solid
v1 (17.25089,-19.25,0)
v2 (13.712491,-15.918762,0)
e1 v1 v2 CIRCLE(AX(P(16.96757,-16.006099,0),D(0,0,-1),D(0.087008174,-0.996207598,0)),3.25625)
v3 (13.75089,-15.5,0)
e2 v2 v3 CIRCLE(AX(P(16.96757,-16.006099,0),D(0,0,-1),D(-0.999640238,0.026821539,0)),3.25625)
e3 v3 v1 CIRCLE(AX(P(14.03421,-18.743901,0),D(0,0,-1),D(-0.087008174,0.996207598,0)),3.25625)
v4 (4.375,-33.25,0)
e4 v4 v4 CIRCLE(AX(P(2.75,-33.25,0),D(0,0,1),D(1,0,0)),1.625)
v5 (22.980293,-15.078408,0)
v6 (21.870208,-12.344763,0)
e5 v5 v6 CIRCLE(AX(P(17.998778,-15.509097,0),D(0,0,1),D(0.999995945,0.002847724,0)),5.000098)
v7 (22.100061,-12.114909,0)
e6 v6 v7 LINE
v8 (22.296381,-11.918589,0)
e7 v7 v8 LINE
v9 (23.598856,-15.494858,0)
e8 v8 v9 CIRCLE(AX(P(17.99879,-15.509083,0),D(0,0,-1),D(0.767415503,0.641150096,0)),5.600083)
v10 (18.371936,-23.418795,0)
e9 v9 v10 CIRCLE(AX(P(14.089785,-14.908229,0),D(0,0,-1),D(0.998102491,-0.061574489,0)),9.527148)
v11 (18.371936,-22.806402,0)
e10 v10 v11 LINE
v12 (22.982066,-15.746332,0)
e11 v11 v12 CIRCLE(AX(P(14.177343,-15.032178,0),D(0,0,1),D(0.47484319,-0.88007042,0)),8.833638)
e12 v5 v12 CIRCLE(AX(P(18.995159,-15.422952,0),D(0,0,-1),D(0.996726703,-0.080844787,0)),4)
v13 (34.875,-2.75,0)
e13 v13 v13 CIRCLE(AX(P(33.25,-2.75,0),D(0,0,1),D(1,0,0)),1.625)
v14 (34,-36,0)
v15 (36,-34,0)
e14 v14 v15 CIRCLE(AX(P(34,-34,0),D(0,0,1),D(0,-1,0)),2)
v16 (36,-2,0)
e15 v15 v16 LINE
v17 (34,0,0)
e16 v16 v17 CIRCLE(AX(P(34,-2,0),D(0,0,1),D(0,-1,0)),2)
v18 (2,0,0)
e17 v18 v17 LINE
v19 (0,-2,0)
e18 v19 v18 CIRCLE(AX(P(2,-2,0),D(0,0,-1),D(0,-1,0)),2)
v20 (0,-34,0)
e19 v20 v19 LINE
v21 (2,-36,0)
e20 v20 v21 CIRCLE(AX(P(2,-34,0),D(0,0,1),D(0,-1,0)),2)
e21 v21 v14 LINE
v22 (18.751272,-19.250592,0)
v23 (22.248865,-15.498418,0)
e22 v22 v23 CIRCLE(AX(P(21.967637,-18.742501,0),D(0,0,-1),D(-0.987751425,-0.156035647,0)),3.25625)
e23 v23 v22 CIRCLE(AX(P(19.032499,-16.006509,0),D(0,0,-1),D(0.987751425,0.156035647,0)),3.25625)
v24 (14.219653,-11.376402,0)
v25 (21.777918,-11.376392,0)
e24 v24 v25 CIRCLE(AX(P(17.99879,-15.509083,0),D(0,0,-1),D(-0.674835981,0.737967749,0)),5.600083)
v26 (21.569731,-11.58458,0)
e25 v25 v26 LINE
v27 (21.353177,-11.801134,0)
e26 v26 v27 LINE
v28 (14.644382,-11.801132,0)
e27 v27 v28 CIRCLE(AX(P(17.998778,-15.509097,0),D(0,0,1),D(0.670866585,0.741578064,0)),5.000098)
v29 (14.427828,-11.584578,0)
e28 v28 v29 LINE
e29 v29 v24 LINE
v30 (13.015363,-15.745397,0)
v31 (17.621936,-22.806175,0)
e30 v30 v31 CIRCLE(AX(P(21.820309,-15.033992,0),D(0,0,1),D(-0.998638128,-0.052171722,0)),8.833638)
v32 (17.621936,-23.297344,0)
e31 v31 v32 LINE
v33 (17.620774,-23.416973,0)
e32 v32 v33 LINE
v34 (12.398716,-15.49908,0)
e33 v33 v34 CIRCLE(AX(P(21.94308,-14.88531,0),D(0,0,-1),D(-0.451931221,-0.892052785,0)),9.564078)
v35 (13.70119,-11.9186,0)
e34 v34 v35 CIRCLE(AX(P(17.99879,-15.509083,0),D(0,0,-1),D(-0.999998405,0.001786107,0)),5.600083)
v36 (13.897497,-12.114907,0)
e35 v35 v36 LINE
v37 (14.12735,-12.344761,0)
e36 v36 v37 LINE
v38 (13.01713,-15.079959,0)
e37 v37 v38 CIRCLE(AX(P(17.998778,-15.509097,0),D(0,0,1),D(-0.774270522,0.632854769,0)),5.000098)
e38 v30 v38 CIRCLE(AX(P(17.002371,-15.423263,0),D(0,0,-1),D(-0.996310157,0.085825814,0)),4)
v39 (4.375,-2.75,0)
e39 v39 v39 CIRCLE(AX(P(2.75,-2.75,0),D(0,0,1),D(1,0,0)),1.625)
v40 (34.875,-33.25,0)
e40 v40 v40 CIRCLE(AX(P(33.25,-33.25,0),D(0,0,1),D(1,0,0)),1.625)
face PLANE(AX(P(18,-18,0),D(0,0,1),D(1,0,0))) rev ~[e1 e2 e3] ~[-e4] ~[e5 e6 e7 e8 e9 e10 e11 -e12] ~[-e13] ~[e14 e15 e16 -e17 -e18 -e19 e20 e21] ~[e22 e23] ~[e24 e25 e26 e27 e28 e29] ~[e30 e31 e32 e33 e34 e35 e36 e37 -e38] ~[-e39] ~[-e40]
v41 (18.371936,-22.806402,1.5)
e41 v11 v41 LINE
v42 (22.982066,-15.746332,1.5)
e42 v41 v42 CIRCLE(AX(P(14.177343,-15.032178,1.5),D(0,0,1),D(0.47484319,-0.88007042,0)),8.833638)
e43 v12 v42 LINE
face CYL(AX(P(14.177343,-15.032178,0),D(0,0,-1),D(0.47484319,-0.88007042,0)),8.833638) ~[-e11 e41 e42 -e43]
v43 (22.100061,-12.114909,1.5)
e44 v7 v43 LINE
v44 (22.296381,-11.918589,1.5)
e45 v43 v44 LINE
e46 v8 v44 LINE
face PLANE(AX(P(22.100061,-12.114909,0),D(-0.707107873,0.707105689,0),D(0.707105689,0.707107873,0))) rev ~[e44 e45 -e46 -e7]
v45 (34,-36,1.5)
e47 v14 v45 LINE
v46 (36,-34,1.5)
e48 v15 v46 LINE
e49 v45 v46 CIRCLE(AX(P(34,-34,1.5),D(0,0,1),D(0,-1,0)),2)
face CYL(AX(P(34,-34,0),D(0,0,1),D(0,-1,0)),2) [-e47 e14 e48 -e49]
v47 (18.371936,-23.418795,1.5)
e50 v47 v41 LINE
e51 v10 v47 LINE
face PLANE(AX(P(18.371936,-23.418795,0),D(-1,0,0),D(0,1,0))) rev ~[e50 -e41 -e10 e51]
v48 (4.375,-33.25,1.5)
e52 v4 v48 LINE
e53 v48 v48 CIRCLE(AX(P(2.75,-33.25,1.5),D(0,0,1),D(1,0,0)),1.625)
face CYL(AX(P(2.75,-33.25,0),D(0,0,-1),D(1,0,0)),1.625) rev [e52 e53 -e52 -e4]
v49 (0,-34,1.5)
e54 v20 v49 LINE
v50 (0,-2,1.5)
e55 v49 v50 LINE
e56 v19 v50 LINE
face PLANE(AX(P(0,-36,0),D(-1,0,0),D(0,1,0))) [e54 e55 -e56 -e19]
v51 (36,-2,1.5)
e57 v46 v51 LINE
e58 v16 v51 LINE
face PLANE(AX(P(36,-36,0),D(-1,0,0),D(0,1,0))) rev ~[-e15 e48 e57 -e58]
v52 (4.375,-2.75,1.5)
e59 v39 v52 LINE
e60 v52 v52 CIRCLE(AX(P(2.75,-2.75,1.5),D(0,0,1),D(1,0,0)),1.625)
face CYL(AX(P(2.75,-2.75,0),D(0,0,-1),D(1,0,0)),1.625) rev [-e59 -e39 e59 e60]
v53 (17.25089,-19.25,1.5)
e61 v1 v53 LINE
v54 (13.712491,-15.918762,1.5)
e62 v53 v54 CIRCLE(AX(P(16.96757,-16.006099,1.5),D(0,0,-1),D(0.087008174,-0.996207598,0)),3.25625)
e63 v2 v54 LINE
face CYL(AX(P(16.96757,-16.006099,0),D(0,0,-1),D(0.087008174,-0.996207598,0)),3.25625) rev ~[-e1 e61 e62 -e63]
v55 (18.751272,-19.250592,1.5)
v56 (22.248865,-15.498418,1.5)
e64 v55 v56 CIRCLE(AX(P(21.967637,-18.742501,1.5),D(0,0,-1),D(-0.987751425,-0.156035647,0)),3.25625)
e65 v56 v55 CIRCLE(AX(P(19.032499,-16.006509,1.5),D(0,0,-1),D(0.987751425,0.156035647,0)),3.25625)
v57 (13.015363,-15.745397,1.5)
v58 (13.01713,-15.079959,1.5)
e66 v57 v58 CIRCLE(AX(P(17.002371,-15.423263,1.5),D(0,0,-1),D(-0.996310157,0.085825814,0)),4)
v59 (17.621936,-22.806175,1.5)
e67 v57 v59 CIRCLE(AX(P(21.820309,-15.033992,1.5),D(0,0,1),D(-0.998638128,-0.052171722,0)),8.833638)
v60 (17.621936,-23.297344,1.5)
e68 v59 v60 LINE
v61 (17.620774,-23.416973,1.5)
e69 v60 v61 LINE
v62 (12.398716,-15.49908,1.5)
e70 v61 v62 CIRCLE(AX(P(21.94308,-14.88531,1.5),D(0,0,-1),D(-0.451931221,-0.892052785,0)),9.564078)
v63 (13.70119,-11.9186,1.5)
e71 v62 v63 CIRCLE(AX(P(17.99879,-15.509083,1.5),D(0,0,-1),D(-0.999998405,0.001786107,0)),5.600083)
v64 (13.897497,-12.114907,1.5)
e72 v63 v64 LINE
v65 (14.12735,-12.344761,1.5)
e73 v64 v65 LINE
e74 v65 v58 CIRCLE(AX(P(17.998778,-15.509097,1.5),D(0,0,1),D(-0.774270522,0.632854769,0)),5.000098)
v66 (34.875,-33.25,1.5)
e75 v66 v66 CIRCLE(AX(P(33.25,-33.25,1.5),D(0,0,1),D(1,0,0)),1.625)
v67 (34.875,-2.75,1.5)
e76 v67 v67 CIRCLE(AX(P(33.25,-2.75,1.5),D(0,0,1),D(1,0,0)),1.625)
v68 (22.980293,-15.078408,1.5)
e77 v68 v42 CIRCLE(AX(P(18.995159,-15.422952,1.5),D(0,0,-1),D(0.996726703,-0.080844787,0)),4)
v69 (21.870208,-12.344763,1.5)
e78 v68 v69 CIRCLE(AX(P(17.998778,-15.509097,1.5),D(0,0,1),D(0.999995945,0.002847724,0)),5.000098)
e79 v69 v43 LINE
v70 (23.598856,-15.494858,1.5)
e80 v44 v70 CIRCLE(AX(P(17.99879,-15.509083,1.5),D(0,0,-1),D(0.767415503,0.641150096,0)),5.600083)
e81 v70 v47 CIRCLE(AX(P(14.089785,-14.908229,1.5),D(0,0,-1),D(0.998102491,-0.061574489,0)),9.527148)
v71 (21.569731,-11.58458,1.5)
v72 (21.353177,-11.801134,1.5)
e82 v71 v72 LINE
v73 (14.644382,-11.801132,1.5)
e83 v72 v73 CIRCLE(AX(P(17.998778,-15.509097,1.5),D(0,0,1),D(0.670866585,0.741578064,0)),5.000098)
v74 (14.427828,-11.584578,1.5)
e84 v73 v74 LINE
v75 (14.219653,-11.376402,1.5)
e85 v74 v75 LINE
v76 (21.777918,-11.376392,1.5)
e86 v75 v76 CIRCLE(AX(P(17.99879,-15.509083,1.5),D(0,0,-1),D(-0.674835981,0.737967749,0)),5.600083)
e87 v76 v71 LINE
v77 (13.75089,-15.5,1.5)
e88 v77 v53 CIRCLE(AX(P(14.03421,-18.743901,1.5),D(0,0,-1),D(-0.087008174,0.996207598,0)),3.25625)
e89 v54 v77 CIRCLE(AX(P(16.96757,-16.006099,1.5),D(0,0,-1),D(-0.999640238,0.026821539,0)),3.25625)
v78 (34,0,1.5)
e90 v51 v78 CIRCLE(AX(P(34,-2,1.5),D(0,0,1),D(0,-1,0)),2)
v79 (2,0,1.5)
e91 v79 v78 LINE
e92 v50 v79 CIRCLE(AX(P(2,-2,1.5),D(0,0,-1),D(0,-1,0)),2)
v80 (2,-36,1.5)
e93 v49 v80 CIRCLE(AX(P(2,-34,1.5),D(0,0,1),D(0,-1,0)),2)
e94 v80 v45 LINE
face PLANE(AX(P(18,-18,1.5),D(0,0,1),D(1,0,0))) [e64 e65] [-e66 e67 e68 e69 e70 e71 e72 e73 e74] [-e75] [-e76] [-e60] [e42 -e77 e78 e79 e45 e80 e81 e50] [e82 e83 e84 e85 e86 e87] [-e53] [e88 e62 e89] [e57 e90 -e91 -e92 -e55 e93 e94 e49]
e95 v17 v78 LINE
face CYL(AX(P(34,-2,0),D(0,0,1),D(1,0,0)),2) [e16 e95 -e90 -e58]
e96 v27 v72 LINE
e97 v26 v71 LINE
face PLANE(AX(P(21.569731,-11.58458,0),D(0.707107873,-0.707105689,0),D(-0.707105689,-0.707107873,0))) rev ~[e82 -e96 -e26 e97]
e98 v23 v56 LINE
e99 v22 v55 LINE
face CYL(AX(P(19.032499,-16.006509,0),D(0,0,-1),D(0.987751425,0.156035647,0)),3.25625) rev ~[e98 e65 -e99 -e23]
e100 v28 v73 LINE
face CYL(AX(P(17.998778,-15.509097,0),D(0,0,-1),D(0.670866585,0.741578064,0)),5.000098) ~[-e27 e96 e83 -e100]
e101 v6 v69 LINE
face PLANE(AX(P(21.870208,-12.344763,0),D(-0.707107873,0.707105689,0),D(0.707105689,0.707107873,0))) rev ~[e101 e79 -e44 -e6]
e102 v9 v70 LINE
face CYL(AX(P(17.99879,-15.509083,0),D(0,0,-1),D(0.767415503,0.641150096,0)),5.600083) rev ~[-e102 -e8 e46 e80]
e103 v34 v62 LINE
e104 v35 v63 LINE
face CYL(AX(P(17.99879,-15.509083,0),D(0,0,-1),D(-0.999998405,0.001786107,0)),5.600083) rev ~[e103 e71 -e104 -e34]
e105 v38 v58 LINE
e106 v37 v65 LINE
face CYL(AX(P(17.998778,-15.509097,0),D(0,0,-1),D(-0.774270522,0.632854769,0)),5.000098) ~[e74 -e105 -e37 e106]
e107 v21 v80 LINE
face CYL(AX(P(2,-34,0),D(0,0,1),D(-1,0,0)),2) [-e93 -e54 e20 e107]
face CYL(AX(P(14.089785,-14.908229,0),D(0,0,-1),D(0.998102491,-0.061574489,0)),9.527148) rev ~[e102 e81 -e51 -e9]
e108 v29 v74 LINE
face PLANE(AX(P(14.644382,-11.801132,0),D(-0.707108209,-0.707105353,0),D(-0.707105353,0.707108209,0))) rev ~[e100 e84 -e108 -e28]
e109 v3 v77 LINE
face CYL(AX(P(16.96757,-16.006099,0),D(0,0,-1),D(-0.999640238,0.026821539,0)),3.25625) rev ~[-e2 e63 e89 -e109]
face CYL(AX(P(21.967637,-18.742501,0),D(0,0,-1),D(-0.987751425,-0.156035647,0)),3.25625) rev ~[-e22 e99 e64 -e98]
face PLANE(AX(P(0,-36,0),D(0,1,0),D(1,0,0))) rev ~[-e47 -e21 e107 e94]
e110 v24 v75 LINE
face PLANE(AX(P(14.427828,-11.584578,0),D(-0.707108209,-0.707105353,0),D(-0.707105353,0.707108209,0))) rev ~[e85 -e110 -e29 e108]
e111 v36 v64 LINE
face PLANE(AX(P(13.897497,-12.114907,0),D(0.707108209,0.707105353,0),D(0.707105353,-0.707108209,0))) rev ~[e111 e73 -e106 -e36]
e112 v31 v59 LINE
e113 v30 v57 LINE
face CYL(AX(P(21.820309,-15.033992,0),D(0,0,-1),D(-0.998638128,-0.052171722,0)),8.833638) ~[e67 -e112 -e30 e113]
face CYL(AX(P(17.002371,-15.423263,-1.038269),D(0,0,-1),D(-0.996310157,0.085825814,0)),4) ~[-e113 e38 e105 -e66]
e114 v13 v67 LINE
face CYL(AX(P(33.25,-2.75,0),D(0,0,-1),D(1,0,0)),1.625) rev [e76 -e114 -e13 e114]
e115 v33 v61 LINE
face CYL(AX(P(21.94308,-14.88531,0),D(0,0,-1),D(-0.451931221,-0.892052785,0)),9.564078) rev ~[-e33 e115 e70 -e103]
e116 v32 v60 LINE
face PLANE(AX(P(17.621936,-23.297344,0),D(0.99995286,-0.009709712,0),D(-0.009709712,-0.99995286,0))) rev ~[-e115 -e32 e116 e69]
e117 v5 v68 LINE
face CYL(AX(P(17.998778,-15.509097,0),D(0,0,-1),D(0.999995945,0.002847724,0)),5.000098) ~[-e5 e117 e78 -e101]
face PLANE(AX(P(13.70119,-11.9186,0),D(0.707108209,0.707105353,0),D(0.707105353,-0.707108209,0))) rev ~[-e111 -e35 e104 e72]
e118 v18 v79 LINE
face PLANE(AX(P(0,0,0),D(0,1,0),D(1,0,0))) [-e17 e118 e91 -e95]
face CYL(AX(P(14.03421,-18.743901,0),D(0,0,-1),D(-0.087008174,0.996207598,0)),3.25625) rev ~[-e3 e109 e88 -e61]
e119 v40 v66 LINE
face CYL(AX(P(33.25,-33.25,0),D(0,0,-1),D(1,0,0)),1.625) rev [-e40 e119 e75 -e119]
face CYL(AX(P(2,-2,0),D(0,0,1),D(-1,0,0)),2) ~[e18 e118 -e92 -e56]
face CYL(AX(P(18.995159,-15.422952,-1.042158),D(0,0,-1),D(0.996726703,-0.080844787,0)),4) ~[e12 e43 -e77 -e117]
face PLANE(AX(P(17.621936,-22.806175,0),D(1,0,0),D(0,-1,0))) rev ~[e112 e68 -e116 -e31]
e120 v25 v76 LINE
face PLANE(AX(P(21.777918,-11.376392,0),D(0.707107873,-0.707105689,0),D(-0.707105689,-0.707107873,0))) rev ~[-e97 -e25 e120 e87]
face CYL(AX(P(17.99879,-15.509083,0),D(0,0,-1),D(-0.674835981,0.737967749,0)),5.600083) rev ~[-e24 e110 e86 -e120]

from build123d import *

# Parameters (mm, degrees)
F0_W        = 36
F0_H        = 36
F0_R        = 1.625
F1_DEPTH    = 1.5
F2_R        = 2
F3_T1_DEPTH = 3.5843159378
F3_T3_DEPTH = 3.5765382717


# Not quite as in the source:
# - a fillet or chamfer that OpenCascade refuses, or shapes differently, is made with other operations: its cross-section is extruded or revolved along the edge and cut away or added


with BuildPart() as f1:
    # F0 (on Top) → F1 (new body)
    with BuildSketch(Plane.XY):
        with Locations((18, -18)):
            Rectangle(F0_W, F0_H)
        with Locations((2.75, -33.25)):
            Circle(F0_R, mode=Mode.SUBTRACT)
        with Locations((33.25, -33.25)):
            Circle(F0_R, mode=Mode.SUBTRACT)
        with BuildLine():
            ThreePointArc((21.7779175478, -11.3763919814), (22.046238649, -11.6387988402), (22.2963811606, -11.918588577))
            ThreePointArc((22.2963811606, -11.918588577), (23.2607600241, -13.5926773143), (23.5988556823, -15.4948579101))
            ThreePointArc((23.5988556823, -15.4948579101), (22.0425607669, -20.1541714045), (18.3719356765, -23.4187950503))
            ThreePointArc((18.3719356765, -23.4187950503), (18.1854087753, -23.510113363), (17.9969356765, -23.5973441498))
            ThreePointArc((17.9969356765, -23.5973441498), (17.8078713111, -23.5092095417), (17.6207740645, -23.4169725439))
            ThreePointArc((17.6207740645, -23.4169725439), (13.9590716003, -20.150973111), (12.3987158352, -15.4990802577))
            ThreePointArc((12.3987158352, -15.4990802577), (12.7360960776, -13.5946679159), (13.7011902766, -11.9185996051))
            ThreePointArc((13.7011902766, -11.9185996051), (13.9513320879, -11.638809208), (14.2196525358, -11.3764016446))
            ThreePointArc((14.2196525358, -11.3764016446), (17.9987831657, -9.9089991809), (21.7779175478, -11.3763919814))
        make_face(mode=Mode.SUBTRACT)
        with Locations((2.75, -2.75)):
            Circle(F0_R, mode=Mode.SUBTRACT)
        with Locations((33.25, -2.75)):
            Circle(F0_R, mode=Mode.SUBTRACT)
        with BuildLine():
            ThreePointArc((18.3719356765, -22.8064015707), (21.6418869825, -19.7559203536), (22.9988556823, -15.4948579101))
            ThreePointArc((22.9988556823, -15.4948579101), (22.7058670076, -13.8225937813), (21.8702080342, -12.3447630196))
            ThreePointArc((21.8702080342, -12.3447630196), (21.6219028277, -12.0632376766), (21.3531767506, -11.8011340904))
            ThreePointArc((21.3531767506, -11.8011340904), (17.9987795183, -10.508999181), (14.644381672, -11.8011324963))
            ThreePointArc((14.644381672, -11.8011324963), (14.3756554704, -12.0632359548), (14.12735013, -12.3447611798))
            ThreePointArc((14.12735013, -12.3447611798), (13.2916900536, -13.8225926629), (12.9987009782, -15.4948579101))
            ThreePointArc((12.9987009782, -15.4948579101), (14.3541308063, -19.7551514484), (17.6219356765, -22.8061746181))
            ThreePointArc((17.6219356765, -22.8061746181), (17.8082968783, -22.9039932616), (17.9969356765, -22.9973441498))
            ThreePointArc((17.9969356765, -22.9973441498), (18.1855728443, -22.9041061909), (18.3719356765, -22.8064015707))
        make_face()
        with BuildLine():
            ThreePointArc((13.7508900496, -15.5000002377), (16.4147091349, -16.5221024247), (17.2508900496, -19.2500002377))
            ThreePointArc((17.2508900496, -19.2500002377), (14.7355024037, -18.3769724477), (13.7124911572, -15.9187616104))
            ThreePointArc((13.7124911572, -15.9187616104), (13.7249235892, -15.7087604135), (13.7508900496, -15.5000002377))
        make_face(mode=Mode.SUBTRACT)
        with BuildLine():
            ThreePointArc((18.7512718965, -19.25059231), (19.5857343833, -16.5222080691), (22.2488645533, -15.4984180975))
            ThreePointArc((22.2488645533, -15.4984180975), (21.4144020665, -18.2268023385), (18.7512718965, -19.25059231))
        make_face(mode=Mode.SUBTRACT)
        with BuildLine():
            Line((18.3719356765, -23.2973441498), (18.3719356765, -22.8064015707))
            ThreePointArc((18.3719356765, -22.8064015707), (18.1855728443, -22.9041061909), (17.9969356765, -22.9973441498))
            ThreePointArc((17.9969356765, -22.9973441498), (17.8082968783, -22.9039932616), (17.6219356765, -22.8061746181))
            Line((17.6219356765, -22.8061746181), (17.6219356765, -23.2973441498))
            Line((17.6219356765, -23.2973441498), (17.6207740645, -23.4169725439))
            ThreePointArc((17.6207740645, -23.4169725439), (17.8078713111, -23.5092095417), (17.9969356765, -23.5973441498))
            ThreePointArc((17.9969356765, -23.5973441498), (18.1854087753, -23.510113363), (18.3719356765, -23.4187950503))
            Line((18.3719356765, -23.4187950503), (18.3719356765, -23.2973441498))
        make_face()
        with BuildLine():
            ThreePointArc((21.3531767506, -11.8011340904), (21.6219028277, -12.0632376766), (21.8702080342, -12.3447630196))
            Line((21.8702080342, -12.3447630196), (22.1000614519, -12.114908892))
            Line((22.1000614519, -12.114908892), (22.2963811606, -11.918588577))
            ThreePointArc((22.2963811606, -11.918588577), (22.046238649, -11.6387988402), (21.7779175478, -11.3763919814))
            Line((21.7779175478, -11.3763919814), (21.5697305471, -11.5845796251))
            Line((21.5697305471, -11.5845796251), (21.3531767506, -11.8011340904))
        make_face()
        with BuildLine():
            ThreePointArc((14.12735013, -12.3447611798), (14.3756554704, -12.0632359548), (14.644381672, -11.8011324963))
            Line((14.644381672, -11.8011324963), (14.4278279784, -11.584577928))
            Line((14.4278279784, -11.584577928), (14.2196525358, -11.3764016446))
            ThreePointArc((14.2196525358, -11.3764016446), (13.9513320879, -11.638809208), (13.7011902766, -11.9185996051))
            Line((13.7011902766, -11.9185996051), (13.8974968216, -12.114906943))
            Line((13.8974968216, -12.114906943), (14.12735013, -12.3447611798))
        make_face()
    extrude(amount=F1_DEPTH)

    # F2
    f2_edges = [f1.edges().sort_by_distance(p)[0] for p in [
        (36, -36, 0.75),
        (0, -36, 0.75),
        (36, 0, 0.75),
        (0, 0, 0.75),
    ]]
    fillet(f2_edges, radius=F2_R)

    # F3: fillet of radius 4 on 2 edges, made by hand

    # F3_s2 → F3_t1 (cut)
    with BuildSketch(Plane.XY.offset(-1.0421579689)):
        with BuildLine():
            ThreePointArc((22.982065791, -15.7463315161), (22.9951448823, -15.4123328014), (22.980292521, -15.0784082419))
            ThreePointArc((22.980292521, -15.0784082419), (22.9939159673, -15.2864395382), (22.9988556823, -15.4948579101))
            ThreePointArc((22.9988556823, -15.4948579101), (22.9913576348, -15.6206545954), (22.982065791, -15.7463315161))
        make_face()
    extrude(amount=F3_T1_DEPTH, mode=Mode.SUBTRACT)

    # F3_s4 → F3_t3 (cut)
    with BuildSketch(Plane.XY.offset(-1.0382691359)):
        with BuildLine():
            ThreePointArc((13.0171302774, -15.0799593578), (13.0023850075, -15.4126416016), (13.0153633645, -15.745397459))
            ThreePointArc((13.0153633645, -15.745397459), (13.0061419392, -15.6201868903), (12.9987009782, -15.4948579101))
            ThreePointArc((12.9987009782, -15.4948579101), (13.0036060893, -15.2872172094), (13.0171302774, -15.0799593578))
        make_face()
    extrude(amount=F3_T3_DEPTH, mode=Mode.SUBTRACT)


solid = f1.part
